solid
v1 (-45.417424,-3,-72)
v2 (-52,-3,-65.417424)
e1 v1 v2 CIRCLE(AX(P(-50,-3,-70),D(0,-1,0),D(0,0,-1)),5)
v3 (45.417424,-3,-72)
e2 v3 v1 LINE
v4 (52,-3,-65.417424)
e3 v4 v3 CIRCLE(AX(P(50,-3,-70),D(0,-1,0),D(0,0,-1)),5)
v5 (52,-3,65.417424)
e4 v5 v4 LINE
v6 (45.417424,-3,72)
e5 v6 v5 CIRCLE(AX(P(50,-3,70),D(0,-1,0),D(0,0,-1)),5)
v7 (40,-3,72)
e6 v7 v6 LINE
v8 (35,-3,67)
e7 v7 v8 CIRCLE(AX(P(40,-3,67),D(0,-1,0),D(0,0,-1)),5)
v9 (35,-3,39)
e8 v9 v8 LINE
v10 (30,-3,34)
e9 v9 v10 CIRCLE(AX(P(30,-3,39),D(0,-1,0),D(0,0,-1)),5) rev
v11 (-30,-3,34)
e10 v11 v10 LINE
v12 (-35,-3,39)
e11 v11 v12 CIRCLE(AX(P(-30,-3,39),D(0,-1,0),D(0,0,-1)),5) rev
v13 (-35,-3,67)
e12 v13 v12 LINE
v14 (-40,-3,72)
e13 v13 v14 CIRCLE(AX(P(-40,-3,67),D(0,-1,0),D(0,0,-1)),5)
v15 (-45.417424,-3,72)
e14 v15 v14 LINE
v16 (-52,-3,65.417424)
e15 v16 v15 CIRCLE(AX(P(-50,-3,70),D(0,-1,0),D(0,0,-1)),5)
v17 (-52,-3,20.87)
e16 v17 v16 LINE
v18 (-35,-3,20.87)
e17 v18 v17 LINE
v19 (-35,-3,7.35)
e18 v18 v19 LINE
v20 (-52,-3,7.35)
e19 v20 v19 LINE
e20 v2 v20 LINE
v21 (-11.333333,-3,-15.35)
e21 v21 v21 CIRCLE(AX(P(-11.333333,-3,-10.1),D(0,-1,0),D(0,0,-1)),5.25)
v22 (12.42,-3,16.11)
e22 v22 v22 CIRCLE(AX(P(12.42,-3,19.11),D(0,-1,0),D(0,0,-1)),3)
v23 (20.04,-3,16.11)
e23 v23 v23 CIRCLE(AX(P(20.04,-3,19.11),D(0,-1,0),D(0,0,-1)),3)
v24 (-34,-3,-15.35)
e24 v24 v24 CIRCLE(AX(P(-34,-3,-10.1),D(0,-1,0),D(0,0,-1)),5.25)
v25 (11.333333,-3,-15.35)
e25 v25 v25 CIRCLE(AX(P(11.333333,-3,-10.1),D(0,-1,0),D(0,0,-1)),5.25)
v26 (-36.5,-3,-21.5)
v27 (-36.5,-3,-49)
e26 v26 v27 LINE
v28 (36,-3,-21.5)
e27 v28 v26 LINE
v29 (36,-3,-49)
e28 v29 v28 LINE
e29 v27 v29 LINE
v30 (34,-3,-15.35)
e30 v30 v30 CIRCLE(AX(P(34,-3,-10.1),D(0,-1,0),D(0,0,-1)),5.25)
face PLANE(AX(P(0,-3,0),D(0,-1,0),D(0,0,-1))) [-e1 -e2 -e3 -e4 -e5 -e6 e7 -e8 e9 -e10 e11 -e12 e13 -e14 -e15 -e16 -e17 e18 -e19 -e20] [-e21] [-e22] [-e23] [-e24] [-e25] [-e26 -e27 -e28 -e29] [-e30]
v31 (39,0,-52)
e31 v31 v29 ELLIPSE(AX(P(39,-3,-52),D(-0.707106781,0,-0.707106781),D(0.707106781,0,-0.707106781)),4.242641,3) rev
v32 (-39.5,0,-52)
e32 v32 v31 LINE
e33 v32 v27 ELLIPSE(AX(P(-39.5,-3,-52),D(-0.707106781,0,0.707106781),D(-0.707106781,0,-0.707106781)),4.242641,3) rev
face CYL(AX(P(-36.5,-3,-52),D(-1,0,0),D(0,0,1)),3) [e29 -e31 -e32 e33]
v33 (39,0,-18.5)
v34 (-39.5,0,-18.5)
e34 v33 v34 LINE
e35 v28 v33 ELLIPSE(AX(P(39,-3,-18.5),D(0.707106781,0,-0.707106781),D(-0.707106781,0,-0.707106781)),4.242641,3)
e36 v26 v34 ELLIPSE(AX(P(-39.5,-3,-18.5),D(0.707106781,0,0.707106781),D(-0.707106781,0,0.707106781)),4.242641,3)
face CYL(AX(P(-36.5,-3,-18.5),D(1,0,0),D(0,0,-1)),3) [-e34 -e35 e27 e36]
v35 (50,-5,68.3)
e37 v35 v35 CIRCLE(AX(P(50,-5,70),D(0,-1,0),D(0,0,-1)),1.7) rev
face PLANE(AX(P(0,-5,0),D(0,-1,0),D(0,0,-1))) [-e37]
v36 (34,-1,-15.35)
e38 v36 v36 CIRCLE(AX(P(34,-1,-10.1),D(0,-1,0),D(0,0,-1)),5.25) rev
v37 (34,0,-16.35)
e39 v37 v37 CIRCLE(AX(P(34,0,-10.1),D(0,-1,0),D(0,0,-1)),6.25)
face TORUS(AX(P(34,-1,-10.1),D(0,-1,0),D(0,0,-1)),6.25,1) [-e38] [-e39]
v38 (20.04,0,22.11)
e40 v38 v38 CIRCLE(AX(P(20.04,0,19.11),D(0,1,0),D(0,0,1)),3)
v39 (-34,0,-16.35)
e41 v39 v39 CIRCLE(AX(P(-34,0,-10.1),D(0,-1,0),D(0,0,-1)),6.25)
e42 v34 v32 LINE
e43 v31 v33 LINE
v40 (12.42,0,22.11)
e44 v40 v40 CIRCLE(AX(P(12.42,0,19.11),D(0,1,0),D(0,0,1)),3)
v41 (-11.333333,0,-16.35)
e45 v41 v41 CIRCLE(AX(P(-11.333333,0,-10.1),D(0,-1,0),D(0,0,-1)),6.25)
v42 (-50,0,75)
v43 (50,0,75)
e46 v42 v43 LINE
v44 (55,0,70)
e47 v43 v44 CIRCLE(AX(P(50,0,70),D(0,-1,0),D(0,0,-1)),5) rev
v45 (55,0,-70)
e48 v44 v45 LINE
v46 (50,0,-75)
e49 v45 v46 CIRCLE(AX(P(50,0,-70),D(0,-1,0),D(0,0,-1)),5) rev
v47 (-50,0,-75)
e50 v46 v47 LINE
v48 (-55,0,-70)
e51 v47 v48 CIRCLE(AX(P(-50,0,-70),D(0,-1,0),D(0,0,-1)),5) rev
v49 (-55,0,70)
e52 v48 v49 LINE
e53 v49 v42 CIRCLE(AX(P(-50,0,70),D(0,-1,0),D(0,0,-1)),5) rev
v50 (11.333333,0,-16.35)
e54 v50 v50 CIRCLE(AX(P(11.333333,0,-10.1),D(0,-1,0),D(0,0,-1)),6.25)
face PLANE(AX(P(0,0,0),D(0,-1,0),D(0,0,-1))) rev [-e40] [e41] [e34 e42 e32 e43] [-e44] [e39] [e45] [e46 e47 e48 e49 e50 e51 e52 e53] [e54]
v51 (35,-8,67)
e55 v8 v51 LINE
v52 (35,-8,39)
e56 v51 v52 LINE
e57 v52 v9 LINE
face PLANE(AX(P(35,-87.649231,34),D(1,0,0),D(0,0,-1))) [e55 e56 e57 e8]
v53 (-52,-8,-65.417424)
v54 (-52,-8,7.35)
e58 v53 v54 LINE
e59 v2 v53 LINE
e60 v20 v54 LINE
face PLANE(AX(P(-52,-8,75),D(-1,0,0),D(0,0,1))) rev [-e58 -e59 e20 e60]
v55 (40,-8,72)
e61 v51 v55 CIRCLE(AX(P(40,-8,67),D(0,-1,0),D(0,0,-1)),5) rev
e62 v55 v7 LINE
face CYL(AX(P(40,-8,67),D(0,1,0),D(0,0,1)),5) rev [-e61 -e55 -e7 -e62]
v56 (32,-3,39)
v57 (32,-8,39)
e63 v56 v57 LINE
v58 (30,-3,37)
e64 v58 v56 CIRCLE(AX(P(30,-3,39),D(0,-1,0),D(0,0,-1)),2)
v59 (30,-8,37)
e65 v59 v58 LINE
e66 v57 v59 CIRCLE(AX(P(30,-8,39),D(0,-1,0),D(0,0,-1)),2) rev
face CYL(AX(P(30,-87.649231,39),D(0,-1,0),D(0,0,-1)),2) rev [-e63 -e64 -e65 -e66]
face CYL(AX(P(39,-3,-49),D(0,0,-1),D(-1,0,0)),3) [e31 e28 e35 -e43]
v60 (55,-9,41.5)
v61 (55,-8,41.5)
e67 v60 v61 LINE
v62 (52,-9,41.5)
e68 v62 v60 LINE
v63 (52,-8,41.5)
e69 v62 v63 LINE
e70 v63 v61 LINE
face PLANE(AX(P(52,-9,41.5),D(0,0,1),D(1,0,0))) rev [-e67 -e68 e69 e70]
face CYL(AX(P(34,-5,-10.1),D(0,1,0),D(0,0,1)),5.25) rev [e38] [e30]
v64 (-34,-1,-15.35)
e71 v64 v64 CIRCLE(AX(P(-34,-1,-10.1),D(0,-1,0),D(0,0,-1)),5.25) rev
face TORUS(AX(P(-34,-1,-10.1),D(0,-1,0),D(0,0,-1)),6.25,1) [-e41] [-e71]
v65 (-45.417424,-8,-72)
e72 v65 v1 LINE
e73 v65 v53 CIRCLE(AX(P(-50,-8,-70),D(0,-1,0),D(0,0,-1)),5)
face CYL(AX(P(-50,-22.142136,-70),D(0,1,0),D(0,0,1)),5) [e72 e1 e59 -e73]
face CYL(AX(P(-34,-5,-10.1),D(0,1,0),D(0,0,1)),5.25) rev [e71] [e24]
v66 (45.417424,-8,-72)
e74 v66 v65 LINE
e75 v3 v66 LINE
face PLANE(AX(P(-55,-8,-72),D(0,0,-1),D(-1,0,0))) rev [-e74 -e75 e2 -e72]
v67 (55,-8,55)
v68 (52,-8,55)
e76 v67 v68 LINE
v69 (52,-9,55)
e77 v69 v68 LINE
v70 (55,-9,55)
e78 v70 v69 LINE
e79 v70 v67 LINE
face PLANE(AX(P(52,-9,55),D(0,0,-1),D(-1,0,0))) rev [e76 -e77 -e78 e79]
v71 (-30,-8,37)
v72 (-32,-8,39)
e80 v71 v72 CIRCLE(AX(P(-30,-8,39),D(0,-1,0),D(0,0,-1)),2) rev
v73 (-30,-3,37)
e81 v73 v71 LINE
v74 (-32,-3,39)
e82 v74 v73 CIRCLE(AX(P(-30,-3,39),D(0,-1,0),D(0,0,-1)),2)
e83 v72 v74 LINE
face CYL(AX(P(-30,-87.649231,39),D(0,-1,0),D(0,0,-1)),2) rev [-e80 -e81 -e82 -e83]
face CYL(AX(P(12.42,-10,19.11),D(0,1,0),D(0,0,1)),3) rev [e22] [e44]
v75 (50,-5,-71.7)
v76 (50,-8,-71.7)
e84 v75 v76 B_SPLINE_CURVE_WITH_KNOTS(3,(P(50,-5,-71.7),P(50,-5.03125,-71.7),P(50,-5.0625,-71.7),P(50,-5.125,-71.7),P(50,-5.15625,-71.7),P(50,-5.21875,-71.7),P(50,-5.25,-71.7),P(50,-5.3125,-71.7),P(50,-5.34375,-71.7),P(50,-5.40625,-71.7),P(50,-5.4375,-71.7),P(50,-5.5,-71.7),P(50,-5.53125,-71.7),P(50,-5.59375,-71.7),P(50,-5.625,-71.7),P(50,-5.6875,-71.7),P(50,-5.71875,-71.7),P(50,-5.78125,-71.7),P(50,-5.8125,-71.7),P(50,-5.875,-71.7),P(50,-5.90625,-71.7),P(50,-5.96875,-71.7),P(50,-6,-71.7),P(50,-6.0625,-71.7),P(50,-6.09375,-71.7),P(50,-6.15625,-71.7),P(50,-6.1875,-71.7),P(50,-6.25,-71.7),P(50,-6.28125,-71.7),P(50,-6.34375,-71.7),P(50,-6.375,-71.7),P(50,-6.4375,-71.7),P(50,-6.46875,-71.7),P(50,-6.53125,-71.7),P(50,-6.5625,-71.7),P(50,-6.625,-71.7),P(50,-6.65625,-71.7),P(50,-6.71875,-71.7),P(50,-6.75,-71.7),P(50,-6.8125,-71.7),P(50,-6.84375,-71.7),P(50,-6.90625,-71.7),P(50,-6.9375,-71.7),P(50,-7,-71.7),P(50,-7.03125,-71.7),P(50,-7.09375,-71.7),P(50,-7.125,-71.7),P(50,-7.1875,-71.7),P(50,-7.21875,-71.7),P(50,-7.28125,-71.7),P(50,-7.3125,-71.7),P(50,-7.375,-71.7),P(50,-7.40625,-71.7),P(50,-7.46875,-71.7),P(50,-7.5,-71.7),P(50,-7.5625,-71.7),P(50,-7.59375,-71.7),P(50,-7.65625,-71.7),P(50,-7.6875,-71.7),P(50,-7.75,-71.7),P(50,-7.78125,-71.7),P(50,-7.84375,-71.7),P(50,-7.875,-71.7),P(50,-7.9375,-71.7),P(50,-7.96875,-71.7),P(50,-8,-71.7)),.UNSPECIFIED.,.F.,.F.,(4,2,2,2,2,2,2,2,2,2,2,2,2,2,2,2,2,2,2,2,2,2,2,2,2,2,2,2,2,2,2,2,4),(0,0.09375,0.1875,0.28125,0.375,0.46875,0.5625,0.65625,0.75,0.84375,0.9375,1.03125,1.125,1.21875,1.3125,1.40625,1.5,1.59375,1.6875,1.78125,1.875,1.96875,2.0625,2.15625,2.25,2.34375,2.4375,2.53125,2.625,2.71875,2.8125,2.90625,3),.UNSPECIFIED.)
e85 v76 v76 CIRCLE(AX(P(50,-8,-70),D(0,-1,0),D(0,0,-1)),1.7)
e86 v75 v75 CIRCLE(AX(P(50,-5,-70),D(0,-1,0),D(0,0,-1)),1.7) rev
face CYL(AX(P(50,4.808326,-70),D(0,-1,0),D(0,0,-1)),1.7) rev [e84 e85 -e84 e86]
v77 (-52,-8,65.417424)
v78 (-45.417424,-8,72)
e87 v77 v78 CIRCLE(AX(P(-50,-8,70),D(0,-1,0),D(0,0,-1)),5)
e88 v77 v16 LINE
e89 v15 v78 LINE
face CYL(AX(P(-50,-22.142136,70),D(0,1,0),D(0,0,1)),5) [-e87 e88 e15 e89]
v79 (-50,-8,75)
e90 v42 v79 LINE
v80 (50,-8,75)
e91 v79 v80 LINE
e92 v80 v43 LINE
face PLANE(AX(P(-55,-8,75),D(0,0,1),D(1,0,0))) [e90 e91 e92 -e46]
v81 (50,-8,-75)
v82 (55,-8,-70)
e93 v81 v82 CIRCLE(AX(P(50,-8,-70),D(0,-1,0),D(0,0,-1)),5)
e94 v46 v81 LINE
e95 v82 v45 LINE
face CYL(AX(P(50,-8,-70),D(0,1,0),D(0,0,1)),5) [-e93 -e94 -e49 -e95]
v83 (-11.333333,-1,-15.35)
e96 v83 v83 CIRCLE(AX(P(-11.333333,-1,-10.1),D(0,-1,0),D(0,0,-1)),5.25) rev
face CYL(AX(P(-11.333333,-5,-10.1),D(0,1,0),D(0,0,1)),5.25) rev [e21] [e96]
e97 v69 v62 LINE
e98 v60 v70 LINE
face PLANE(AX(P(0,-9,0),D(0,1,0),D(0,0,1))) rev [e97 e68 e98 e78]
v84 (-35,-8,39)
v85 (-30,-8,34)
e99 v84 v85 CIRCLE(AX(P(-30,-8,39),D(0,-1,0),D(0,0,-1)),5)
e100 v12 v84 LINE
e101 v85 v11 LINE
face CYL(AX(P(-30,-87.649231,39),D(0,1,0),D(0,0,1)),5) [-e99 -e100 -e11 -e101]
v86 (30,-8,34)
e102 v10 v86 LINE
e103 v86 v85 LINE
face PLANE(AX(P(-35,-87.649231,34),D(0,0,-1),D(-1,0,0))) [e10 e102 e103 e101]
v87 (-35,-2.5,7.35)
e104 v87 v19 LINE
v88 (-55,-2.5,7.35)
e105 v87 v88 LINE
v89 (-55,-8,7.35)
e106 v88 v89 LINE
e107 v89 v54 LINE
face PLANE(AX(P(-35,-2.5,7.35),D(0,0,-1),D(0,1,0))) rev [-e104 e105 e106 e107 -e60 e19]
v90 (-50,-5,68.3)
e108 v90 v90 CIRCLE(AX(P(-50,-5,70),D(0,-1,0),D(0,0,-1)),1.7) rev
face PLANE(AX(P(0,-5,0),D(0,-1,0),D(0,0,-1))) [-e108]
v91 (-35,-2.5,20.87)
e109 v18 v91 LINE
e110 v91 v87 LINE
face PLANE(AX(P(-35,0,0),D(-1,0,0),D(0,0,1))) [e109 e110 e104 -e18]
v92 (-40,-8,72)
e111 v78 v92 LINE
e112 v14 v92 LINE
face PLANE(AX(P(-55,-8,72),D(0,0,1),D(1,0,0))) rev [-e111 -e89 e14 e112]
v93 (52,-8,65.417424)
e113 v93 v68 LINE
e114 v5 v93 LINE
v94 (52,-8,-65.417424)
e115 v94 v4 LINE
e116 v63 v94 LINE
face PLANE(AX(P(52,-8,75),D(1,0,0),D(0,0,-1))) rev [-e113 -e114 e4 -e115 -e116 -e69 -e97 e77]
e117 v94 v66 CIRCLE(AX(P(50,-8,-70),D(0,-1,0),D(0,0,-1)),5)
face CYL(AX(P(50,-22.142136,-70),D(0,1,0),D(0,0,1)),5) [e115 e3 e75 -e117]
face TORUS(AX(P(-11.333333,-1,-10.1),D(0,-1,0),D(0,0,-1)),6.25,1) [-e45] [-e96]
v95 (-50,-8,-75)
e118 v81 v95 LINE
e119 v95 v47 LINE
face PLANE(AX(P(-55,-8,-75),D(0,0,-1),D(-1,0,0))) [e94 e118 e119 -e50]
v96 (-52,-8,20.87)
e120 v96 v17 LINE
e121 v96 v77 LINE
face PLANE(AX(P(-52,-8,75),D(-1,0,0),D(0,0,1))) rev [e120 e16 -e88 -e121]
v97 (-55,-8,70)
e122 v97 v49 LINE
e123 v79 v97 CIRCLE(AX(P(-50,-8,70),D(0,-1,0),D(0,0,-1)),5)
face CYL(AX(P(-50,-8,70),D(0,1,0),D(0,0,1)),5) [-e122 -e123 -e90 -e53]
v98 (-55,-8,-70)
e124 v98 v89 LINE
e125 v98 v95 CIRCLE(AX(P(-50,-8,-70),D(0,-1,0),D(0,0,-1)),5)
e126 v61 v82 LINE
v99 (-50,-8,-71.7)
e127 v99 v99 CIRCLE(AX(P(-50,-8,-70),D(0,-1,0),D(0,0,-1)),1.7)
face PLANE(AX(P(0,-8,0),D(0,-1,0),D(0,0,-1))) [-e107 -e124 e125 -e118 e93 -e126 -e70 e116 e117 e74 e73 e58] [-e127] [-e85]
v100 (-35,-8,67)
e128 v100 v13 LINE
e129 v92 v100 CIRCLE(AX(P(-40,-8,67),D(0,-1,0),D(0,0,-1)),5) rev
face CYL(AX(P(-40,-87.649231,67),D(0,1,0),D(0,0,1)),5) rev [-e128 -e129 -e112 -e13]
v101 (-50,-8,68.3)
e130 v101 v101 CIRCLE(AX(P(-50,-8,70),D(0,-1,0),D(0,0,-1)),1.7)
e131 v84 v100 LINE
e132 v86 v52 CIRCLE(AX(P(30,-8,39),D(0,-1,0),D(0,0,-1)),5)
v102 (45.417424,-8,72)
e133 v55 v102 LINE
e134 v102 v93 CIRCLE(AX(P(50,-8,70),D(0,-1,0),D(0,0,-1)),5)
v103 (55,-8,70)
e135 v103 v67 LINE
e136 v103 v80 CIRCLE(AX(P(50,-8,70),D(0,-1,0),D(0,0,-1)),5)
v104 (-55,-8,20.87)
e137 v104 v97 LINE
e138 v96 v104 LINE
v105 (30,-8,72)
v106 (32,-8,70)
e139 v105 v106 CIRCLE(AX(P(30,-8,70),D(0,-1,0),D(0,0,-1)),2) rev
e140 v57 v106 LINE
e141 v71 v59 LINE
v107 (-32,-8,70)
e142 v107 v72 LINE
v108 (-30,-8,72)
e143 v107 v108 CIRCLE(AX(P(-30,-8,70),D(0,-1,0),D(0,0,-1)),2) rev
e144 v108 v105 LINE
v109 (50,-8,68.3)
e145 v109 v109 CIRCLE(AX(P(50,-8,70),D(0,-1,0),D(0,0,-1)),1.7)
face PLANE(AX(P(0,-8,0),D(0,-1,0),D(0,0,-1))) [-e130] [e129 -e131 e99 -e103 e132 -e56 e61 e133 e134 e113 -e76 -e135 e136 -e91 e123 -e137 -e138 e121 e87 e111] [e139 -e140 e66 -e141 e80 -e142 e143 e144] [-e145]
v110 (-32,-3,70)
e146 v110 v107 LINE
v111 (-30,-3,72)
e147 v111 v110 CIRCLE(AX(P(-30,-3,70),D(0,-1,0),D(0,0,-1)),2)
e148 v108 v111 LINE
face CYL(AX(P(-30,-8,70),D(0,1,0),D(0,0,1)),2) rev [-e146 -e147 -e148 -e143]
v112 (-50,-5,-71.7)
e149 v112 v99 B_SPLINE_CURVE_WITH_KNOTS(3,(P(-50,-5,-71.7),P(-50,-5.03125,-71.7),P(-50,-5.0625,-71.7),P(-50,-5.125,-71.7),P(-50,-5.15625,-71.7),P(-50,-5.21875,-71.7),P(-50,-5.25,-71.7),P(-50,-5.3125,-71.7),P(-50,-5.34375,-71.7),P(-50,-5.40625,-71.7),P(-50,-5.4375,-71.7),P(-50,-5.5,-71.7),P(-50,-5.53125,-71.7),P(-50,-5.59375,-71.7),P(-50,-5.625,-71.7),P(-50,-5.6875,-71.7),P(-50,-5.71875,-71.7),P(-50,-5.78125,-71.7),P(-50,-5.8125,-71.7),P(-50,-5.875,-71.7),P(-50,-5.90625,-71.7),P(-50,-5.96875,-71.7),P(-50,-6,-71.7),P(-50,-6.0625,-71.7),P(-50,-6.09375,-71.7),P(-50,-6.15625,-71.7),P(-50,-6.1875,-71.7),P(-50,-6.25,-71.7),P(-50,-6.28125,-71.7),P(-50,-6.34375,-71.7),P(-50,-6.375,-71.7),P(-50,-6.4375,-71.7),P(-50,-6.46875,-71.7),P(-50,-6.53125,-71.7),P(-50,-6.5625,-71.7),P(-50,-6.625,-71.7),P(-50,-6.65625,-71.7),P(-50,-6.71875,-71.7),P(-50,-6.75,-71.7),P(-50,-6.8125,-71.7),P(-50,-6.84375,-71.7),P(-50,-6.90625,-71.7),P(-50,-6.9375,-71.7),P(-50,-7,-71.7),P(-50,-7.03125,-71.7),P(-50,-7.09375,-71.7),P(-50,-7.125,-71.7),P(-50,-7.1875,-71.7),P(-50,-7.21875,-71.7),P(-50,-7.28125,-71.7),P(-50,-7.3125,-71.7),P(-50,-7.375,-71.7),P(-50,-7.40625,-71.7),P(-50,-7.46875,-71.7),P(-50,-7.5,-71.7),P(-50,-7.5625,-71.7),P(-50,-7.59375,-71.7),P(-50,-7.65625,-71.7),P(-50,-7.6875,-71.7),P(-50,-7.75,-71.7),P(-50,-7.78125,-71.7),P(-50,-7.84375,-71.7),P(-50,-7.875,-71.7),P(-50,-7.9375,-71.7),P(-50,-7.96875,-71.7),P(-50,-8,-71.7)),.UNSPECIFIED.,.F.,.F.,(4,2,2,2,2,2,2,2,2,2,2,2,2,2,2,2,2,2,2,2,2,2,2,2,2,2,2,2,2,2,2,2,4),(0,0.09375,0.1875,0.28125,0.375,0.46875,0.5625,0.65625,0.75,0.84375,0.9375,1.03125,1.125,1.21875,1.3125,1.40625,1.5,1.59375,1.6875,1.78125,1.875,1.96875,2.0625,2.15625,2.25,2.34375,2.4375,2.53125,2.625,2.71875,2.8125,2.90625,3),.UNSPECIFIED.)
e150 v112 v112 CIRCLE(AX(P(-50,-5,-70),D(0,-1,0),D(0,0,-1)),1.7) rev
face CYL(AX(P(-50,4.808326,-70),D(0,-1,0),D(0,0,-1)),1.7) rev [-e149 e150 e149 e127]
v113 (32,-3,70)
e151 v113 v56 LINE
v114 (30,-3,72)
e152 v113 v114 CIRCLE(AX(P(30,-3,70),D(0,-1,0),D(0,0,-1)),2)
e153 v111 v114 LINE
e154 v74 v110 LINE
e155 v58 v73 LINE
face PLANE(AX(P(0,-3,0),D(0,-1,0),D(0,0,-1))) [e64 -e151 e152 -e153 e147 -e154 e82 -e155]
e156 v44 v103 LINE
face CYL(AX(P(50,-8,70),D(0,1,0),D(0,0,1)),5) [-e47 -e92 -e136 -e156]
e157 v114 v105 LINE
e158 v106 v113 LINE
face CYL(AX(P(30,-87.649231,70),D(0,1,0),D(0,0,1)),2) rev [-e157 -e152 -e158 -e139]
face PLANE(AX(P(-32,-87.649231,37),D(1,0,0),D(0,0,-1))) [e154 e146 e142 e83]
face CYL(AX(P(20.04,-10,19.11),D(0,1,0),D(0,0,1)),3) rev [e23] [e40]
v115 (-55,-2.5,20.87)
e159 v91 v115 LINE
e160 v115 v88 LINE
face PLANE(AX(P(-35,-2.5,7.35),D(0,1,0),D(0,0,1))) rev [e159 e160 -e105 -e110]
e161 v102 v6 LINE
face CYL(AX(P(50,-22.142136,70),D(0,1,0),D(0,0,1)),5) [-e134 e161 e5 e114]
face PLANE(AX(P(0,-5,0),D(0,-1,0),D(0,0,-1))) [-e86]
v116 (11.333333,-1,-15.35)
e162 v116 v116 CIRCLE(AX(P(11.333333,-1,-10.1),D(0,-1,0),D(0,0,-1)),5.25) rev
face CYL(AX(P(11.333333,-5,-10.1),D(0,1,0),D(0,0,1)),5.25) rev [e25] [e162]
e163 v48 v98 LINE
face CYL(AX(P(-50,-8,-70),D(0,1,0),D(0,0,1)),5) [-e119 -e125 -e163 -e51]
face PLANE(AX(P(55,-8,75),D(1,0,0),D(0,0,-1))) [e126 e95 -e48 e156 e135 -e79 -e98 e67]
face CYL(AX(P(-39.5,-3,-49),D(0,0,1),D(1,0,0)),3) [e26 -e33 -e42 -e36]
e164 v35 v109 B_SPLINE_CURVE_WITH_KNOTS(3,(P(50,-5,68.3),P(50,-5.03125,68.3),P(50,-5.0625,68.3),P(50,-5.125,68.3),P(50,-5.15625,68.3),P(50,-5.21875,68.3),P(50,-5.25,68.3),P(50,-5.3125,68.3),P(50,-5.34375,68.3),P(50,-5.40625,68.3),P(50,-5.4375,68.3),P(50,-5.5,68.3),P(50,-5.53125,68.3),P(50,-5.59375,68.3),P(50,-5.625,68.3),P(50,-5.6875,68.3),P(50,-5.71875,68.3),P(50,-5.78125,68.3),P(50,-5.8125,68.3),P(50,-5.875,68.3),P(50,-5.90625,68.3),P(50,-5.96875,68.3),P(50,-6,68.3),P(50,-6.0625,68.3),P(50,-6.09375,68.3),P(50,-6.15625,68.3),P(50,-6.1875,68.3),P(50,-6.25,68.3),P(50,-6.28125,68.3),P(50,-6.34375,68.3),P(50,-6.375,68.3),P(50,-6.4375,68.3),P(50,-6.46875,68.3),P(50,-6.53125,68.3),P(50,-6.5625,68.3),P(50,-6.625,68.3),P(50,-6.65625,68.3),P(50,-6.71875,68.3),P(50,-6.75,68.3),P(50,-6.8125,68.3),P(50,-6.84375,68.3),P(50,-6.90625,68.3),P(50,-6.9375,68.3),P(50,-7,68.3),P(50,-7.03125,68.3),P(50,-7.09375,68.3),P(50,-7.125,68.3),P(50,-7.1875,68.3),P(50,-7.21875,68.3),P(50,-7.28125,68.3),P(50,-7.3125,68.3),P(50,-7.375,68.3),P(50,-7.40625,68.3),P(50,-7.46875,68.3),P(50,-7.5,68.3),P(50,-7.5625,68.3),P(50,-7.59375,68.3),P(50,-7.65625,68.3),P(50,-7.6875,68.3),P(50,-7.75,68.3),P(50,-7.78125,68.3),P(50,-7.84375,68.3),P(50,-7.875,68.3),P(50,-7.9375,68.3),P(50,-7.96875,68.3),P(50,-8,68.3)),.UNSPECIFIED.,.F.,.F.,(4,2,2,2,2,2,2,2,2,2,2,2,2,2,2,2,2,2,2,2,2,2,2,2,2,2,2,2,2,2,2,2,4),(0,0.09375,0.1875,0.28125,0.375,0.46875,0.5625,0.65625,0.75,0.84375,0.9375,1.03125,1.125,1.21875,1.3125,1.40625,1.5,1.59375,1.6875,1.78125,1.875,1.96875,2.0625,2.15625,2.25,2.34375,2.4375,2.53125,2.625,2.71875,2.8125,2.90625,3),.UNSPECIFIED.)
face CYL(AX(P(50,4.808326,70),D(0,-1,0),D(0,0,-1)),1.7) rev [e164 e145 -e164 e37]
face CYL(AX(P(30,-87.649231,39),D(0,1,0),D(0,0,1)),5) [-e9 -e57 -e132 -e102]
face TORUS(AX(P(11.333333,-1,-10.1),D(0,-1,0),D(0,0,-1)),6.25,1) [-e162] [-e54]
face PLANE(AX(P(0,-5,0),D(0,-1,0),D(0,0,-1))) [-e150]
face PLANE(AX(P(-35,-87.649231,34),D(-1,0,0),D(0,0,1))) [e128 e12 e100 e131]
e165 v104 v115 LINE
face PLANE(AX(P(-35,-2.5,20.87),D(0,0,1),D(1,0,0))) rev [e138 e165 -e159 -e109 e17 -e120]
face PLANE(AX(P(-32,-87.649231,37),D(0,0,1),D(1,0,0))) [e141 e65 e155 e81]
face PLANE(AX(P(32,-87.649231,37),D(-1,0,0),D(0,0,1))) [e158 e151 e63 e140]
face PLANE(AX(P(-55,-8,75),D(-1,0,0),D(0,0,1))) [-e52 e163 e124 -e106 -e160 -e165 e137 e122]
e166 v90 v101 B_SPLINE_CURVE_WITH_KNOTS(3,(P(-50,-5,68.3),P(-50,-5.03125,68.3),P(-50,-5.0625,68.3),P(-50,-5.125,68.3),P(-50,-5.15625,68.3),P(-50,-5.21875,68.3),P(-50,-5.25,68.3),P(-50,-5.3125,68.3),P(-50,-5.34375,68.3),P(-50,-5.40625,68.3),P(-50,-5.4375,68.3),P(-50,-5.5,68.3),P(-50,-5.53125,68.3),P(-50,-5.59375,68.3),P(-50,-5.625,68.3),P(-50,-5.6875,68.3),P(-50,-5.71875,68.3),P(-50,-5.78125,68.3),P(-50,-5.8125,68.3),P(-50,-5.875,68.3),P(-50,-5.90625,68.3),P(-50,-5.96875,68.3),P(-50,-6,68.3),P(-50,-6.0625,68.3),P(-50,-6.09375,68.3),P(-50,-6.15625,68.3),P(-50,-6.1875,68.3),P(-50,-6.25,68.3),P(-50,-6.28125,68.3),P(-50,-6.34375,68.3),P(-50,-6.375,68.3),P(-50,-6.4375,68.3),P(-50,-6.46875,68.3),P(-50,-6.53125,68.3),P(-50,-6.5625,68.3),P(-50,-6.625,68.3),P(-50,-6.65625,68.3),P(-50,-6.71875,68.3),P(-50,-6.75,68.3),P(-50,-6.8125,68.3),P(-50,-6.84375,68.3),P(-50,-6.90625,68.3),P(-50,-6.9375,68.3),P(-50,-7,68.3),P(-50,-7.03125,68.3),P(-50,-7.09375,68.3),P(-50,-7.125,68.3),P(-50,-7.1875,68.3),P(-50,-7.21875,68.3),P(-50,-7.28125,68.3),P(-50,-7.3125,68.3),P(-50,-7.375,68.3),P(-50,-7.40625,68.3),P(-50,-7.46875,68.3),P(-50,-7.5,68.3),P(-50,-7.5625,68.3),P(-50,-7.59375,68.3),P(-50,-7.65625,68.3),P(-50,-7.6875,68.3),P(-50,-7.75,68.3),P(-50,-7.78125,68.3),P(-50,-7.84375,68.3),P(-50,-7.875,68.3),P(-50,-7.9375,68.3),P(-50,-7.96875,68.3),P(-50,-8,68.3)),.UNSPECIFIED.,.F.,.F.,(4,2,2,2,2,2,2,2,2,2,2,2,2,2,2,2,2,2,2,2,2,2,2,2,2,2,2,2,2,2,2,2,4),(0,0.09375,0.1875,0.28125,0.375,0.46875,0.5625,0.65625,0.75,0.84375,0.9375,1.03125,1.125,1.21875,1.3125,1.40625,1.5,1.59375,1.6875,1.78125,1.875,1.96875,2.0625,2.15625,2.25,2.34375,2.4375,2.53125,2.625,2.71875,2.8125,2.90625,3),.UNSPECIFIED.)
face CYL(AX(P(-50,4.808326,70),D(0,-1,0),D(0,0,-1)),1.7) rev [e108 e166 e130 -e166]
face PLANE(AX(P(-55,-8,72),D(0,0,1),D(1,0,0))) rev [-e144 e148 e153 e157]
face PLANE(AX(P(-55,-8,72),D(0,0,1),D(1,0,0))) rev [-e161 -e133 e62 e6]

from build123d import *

# Parameters (mm, degrees)
ESBO_O1_W                = 110
ESBO_O1_H                = 150
RESSALTO_EXTRUS_O3_DEPTH = 8
FILETE2_R                = 5
CASCA1_T                 = -3
RESSALTO_EXTRUS_O7_START = 5
ESBO_O14_R               = 5
RESSALTO_EXTRUS_O7_DEPTH = 5
RESSALTO_EXTRUS_O4_START = -8
RESSALTO_EXTRUS_O4_DEPTH = 5
FILETE6_R                = 2
FILETE8_R                = 5
ESBO_O15_R               = 1.7
CORTE_EXTRUS_O3_DEPTH    = 3
ESBO_O18_R               = 5.25
CORTE_EXTRUS_O7_DEPTH    = 5
ESBO_O19_W               = 72.5
ESBO_O19_H               = 27.5
CORTE_EXTRUS_O8_DEPTH    = 5
FILETE9_R                = 3
FILETE10_R               = 1
ESBO_O20_R               = 3
CORTE_EXTRUS_O9_DEPTH    = 10
ESBO_O22_W               = 13.52
ESBO_O22_H               = 9.06512497
CORTE_EXTRUS_O11_DEPTH   = 20
ESBO_O8_W                = 3
ESBO_O8_H                = 13.5
RESSALTO_EXTRUS_O9_DEPTH = 1


with BuildPart() as part:
    # Esboço1 → Ressalto-extrusão3 (new body)
    with BuildSketch(Plane(origin=(0, 0, 0), x_dir=(1, 0, 0), z_dir=(0, 1, 0))):
        Rectangle(ESBO_O1_W, ESBO_O1_H)
    extrude(amount=-RESSALTO_EXTRUS_O3_DEPTH)

    # Filete2
    filete2_edges = [part.edges().sort_by_distance(p)[0] for p in [
        (55, -4, 75),
        (-55, -4, 75),
        (-55, -4, -75),
        (55, -4, -75),
    ]]
    fillet(filete2_edges, radius=FILETE2_R)

    # Casca1
    casca1_openings = [part.faces().sort_by_distance(p)[0] for p in [
        (0, -8, 0),
    ]]
    offset(amount=CASCA1_T, openings=casca1_openings, kind=Kind.INTERSECTION)

    # Esboço14 → Ressalto-extrusão7 (add)
    with BuildSketch(Plane(origin=(0, -3, 0), x_dir=(-1, 0, 0), z_dir=(0, -1, 0)).offset(RESSALTO_EXTRUS_O7_START)):
        with Locations((50, -70)):
            Circle(ESBO_O14_R)
        with Locations((-50, -70)):
            Circle(ESBO_O14_R)
        with Locations((-50, 70)):
            Circle(ESBO_O14_R)
        with Locations((50, 70)):
            Circle(ESBO_O14_R)
    extrude(amount=-RESSALTO_EXTRUS_O7_DEPTH)

    # Esboço6 → Ressalto-extrusão4 (add)
    with BuildSketch(Plane(origin=(0, 0, 0), x_dir=(1, 0, 0), z_dir=(0, 1, 0)).offset(RESSALTO_EXTRUS_O4_START)):
        Polygon((-32, -37), (32, -37), (32, -72), (35, -72), (35, -34), (-35, -34), (-35, -72), (-32, -72), align=None)
    extrude(amount=RESSALTO_EXTRUS_O4_DEPTH)

    # Filete6
    filete6_edges = [part.edges().sort_by_distance(p)[0] for p in [
        (-32, -5.5, 72),
        (-32, -5.5, 37),
        (32, -5.5, 37),
        (32, -5.5, 72),
    ]]
    fillet(filete6_edges, radius=FILETE6_R)

    # Filete8
    filete8_edges = [part.edges().sort_by_distance(p)[0] for p in [
        (35, -5.5, 34),
        (-35, -5.5, 34),
        (-35, -5.5, 72),
        (35, -5.5, 72),
    ]]
    fillet(filete8_edges, radius=FILETE8_R)

    # Esboço15 → Corte-extrusão3 (cut)
    with BuildSketch(Plane.XZ.offset(8)):
        with Locations(Location((-50, -70, 0), (0, 0, 270))):
            Circle(ESBO_O15_R)
        with Locations(Location((50, -70, 0), (0, 0, 270))):
            Circle(ESBO_O15_R)
        with Locations(Location((50, 70, 0), (0, 0, 270))):
            Circle(ESBO_O15_R)
        with Locations(Location((-50, 70, 0), (0, 0, 270))):
            Circle(ESBO_O15_R)
    extrude(amount=-CORTE_EXTRUS_O3_DEPTH, mode=Mode.SUBTRACT)

    # Esboço18 → Corte-extrusão7 (cut)
    with BuildSketch(Plane(origin=(0, 0, 0), x_dir=(1, 0, 0), z_dir=(0, 1, 0))):
        with Locations(Location((-34, 10.1, 0), (0, 0, 270))):
            Circle(ESBO_O18_R)
        with Locations(Location((-11.333333333, 10.1, 0), (0, 0, 270))):
            Circle(ESBO_O18_R)
        with Locations(Location((11.333333333, 10.1, 0), (0, 0, 270))):
            Circle(ESBO_O18_R)
        with Locations(Location((34, 10.1, 0), (0, 0, 270))):
            Circle(ESBO_O18_R)
    extrude(amount=-CORTE_EXTRUS_O7_DEPTH, mode=Mode.SUBTRACT)

    # Esboço19 → Corte-extrusão8 (cut)
    with BuildSketch(Plane(origin=(0, 0, 0), x_dir=(1, 0, 0), z_dir=(0, 1, 0))):
        with Locations((-0.25, 35.25)):
            Rectangle(ESBO_O19_W, ESBO_O19_H)
    extrude(amount=-CORTE_EXTRUS_O8_DEPTH, mode=Mode.SUBTRACT)

    # Filete9
    filete9_edges = [part.edges().sort_by_distance(p)[0] for p in [
        (36, 0, -35.25),
        (-0.25, 0, -49),
        (-36.5, 0, -35.25),
        (-0.25, 0, -21.5),
    ]]
    fillet(filete9_edges, radius=FILETE9_R - 0.0001)  # a hair under: the kernel refuses the full size

    # Filete10
    filete10_edges = [part.edges().sort_by_distance(p)[0] for p in [
        (-34, 0, -15.35),
        (-11.333333333, 0, -15.35),
        (11.333333333, 0, -15.35),
        (34, 0, -15.35),
    ]]
    fillet(filete10_edges, radius=FILETE10_R)

    # Esboço20 → Corte-extrusão9 (cut)
    with BuildSketch(Plane(origin=(0, 0, 0), x_dir=(1, 0, 0), z_dir=(0, 1, 0))):
        with Locations(Location((12.42, -19.11, 0), (0, 0, 270))):
            Circle(ESBO_O20_R)
        with Locations(Location((20.04, -19.11, 0), (0, 0, 270))):
            Circle(ESBO_O20_R)
    extrude(amount=-CORTE_EXTRUS_O9_DEPTH, mode=Mode.SUBTRACT)

    # Esboço22 → Corte-extrusão11 (cut)
    with BuildSketch(Plane.ZY.offset(55)):
        with Locations((14.11, -7.032562485)):
            Rectangle(ESBO_O22_W, ESBO_O22_H)
    extrude(amount=-CORTE_EXTRUS_O11_DEPTH, mode=Mode.SUBTRACT)

    # Esboço8 → Ressalto-extrusão9 (add)
    with BuildSketch(Plane(origin=(0, -8, 0), x_dir=(-1, 0, 0), z_dir=(0, -1, 0))):
        with Locations((-53.5, -48.25)):
            Rectangle(ESBO_O8_W, ESBO_O8_H)
    extrude(amount=RESSALTO_EXTRUS_O9_DEPTH)


solid = part.part
